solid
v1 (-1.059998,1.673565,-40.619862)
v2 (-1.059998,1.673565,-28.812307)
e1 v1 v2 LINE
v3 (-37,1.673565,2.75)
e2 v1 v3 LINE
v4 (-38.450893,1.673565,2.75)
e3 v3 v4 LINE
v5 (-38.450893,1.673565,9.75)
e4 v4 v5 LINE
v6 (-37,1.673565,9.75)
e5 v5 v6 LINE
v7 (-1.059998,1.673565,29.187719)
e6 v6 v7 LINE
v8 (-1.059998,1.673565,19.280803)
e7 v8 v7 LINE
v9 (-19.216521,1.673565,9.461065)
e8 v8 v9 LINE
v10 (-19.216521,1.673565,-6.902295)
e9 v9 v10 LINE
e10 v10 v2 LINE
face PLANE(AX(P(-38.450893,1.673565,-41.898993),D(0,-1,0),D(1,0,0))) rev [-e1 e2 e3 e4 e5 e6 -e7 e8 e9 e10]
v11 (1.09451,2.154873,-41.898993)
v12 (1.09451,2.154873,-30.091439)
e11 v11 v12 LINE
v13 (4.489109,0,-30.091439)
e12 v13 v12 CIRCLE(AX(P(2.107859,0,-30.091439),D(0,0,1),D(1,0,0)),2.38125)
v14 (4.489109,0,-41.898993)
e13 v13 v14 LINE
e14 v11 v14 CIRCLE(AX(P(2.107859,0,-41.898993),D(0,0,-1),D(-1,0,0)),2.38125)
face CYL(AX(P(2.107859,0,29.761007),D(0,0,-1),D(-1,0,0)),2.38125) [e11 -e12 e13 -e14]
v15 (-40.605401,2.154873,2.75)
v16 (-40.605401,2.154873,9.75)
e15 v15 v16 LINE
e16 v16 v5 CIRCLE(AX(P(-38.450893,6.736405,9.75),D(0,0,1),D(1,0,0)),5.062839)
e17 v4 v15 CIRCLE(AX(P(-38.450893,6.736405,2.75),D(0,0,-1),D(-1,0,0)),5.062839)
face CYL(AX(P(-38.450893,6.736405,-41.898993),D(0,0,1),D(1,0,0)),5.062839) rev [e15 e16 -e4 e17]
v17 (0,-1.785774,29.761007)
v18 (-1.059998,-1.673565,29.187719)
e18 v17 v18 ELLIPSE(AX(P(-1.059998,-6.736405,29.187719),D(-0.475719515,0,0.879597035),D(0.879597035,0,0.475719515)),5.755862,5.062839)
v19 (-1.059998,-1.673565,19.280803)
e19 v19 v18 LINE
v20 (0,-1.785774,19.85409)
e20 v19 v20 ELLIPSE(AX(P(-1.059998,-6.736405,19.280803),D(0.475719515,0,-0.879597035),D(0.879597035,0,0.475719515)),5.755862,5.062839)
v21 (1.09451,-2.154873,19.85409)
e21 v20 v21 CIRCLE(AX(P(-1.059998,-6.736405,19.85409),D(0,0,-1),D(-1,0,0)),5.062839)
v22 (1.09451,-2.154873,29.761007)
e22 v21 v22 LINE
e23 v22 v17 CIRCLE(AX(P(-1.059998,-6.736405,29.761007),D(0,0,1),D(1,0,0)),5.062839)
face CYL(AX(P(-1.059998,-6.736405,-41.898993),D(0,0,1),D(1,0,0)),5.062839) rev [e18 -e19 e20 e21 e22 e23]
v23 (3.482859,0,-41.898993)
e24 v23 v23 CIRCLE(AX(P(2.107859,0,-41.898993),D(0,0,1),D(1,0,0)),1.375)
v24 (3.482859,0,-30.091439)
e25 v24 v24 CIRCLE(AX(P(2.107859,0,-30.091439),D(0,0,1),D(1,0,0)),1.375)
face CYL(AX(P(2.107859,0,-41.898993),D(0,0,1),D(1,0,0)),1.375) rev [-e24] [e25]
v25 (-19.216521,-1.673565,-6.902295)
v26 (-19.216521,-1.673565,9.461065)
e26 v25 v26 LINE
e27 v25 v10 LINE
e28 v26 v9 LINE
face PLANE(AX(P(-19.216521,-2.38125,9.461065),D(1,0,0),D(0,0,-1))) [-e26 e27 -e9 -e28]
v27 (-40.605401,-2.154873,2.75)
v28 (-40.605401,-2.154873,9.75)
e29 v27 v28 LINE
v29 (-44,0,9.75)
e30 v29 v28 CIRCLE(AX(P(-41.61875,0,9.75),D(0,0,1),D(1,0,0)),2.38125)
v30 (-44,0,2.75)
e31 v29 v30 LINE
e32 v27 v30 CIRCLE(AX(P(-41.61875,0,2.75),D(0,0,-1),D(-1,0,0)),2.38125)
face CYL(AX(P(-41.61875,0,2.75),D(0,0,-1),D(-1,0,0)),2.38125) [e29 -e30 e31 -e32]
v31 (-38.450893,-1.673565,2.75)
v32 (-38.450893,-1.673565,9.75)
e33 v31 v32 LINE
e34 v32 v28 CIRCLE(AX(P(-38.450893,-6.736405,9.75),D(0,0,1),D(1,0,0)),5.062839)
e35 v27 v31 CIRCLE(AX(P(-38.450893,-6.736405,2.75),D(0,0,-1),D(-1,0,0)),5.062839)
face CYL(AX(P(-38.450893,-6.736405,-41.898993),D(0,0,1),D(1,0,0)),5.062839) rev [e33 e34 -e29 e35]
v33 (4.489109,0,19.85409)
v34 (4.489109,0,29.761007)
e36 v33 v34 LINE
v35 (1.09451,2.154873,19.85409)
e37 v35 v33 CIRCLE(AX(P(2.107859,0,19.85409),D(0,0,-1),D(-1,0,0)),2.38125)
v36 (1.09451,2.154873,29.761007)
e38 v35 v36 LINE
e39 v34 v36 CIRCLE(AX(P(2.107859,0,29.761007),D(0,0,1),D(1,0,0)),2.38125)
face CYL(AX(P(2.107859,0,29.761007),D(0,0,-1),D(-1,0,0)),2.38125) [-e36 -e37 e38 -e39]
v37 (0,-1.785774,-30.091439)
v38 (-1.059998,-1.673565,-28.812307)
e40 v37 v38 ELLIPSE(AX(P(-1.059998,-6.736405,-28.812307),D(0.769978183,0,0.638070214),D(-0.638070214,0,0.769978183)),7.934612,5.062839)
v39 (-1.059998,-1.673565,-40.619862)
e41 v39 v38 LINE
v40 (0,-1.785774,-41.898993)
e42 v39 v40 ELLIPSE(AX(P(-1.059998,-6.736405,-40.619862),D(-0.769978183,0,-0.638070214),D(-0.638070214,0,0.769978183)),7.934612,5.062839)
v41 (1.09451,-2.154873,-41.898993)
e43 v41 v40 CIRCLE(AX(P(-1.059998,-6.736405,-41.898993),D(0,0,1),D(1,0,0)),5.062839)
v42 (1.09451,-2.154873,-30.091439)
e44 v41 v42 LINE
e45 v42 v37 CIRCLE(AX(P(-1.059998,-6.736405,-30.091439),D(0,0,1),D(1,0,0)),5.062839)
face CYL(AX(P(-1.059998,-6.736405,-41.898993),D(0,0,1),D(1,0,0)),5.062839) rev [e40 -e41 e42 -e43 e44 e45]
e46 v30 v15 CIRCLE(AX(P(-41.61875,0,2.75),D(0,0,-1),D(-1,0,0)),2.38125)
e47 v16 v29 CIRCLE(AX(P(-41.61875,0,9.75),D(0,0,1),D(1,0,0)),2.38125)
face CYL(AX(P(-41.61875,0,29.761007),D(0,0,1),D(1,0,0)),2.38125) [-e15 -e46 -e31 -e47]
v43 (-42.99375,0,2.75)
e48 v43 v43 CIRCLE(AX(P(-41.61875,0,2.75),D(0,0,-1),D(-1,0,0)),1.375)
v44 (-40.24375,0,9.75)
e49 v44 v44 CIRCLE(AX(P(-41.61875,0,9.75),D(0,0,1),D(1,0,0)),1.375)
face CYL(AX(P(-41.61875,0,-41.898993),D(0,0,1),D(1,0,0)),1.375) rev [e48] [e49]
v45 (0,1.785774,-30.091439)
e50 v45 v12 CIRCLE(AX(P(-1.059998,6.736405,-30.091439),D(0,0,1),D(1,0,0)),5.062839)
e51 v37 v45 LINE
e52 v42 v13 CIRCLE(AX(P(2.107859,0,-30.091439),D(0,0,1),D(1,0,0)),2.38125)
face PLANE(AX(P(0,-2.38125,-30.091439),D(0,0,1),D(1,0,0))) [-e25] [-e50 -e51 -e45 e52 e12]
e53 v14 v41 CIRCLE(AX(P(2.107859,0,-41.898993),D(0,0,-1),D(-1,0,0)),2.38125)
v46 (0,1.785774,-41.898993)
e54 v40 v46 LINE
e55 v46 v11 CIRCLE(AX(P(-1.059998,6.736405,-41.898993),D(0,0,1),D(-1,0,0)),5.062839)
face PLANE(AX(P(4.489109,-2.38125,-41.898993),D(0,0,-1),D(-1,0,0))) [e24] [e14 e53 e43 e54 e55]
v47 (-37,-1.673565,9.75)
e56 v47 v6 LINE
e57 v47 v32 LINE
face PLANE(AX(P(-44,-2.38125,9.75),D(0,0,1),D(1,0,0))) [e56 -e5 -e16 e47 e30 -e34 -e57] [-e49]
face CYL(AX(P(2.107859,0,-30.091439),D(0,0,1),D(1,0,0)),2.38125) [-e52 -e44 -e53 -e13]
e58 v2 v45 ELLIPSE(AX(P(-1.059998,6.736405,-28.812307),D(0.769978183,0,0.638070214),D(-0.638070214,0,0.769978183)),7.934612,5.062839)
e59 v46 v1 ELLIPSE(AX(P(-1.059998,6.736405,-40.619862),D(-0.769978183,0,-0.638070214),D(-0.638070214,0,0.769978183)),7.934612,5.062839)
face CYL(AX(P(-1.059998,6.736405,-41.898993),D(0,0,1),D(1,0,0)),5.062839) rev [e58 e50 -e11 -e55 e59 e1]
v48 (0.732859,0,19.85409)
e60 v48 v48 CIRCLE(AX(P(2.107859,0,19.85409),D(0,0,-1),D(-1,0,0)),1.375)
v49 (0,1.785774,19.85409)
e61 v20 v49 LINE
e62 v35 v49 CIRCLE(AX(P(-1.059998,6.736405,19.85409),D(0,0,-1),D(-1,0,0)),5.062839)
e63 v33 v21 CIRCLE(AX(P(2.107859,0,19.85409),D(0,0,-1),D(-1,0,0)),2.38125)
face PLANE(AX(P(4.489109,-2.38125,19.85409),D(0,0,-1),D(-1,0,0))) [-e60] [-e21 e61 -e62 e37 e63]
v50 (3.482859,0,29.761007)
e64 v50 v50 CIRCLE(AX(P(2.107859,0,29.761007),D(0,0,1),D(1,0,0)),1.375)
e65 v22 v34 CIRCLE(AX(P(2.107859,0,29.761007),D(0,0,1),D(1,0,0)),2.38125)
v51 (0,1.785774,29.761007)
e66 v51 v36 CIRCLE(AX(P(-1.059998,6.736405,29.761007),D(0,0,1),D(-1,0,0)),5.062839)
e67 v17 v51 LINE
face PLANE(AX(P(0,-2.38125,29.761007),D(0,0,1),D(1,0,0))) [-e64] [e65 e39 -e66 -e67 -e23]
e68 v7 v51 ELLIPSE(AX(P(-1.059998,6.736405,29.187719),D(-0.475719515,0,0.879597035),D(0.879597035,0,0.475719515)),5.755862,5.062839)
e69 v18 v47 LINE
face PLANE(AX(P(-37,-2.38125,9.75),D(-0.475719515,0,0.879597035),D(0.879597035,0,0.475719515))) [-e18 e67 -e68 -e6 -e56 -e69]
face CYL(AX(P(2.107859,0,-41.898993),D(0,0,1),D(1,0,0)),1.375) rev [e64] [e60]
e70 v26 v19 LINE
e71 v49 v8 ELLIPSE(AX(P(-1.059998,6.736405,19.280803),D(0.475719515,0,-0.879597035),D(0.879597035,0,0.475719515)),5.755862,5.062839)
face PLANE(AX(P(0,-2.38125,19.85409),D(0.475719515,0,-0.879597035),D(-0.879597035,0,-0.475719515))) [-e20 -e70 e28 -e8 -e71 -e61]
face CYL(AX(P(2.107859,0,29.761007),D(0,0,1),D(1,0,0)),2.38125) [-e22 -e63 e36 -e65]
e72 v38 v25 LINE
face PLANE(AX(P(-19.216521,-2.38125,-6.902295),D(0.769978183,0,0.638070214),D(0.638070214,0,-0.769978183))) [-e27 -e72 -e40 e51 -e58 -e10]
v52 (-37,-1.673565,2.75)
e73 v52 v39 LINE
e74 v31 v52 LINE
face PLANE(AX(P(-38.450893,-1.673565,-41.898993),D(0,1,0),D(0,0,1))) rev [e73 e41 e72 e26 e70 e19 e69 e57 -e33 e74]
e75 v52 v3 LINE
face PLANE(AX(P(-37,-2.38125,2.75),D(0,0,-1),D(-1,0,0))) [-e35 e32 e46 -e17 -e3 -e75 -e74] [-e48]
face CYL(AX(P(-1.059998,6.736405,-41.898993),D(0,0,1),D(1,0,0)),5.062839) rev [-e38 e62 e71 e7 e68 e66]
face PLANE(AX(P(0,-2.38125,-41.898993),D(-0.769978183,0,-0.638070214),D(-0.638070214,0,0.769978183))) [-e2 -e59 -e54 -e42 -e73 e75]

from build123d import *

# Parameters (mm, degrees)
BOSS_EXTRUDE1_DEPTH      = 2.38125
BOSS_EXTRUDE1_DEPTH_BACK = 2.38125
CUT_EXTRUDE1_DEPTH       = 68.891743782
CUT_EXTRUDE1_DEPTH_BACK  = 68.891743782
SKETCH2_R                = 1.375
FILLET2_R                = 2.38125
CUT_EXTRUDE2_DEPTH       = 61.804572212
CUT_EXTRUDE2_DEPTH_BACK  = 61.804572212


with BuildPart() as part:
    # Sketch1 → Boss-Extrude1 (new, two sides: drawn at the far end of the back side and taken through both)
    with BuildSketch(Plane(origin=(0, 0, 0), x_dir=(1, 0, 0), z_dir=(0, 1, 0)).offset(-BOSS_EXTRUDE1_DEPTH_BACK)):
        Polygon((0, 41.898993428), (-37, -2.75), (-44, -2.75), (-44, -9.75), (-37, -9.75), (0, -29.761006572), (4.489108528, -29.761006572), (4.489108528, -19.854089936), (0, -19.854089936), (-19.216520838, -9.461064942), (-19.216520838, 6.902295225), (0, 30.091438809), (4.489108528, 30.091438809), (4.489108528, 41.898993428), align=None)
    extrude(amount=BOSS_EXTRUDE1_DEPTH + BOSS_EXTRUDE1_DEPTH_BACK)

    # Sketch2 → Cut-Extrude1 (cut, two sides: drawn at the far end of the back side and taken through both)
    with BuildSketch(Plane.XY.offset(9.75).offset(-CUT_EXTRUDE1_DEPTH_BACK)):
        with Locations((-41.61875, 0)):
            Circle(SKETCH2_R)
        with Locations((2.107858528, 0)):
            Circle(SKETCH2_R)
    extrude(amount=CUT_EXTRUDE1_DEPTH + CUT_EXTRUDE1_DEPTH_BACK, mode=Mode.SUBTRACT)

    # Fillet2
    fillet2_edges = [part.edges().sort_by_distance(p)[0] for p in [
        (4.489108528, 2.38125, -35.995216119),
        (4.489108528, -2.38125, -35.995216119),
        (4.489108528, -2.38125, 24.807548254),
        (4.489108528, 2.38125, 24.807548254),
        (-44, -2.38125, 6.25),
        (-44, 2.38125, 6.25),
    ]]
    fillet(fillet2_edges, radius=FILLET2_R - 0.0001)  # a hair under: the kernel refuses the full size

    # Sketch3 → Cut-Extrude2 (cut, two sides: drawn at the far end of the back side and taken through both)
    with BuildSketch(Plane.XY.offset(-CUT_EXTRUDE2_DEPTH_BACK)):
        with BuildLine():
            Line((-38.450893086, -1.673565387), (-1.059998386, -1.673565387))
            ThreePointArc((-1.059998386, -1.673565387), (0.043808846, -1.795357088), (1.094509688, -2.154872546))
            ThreePointArc((1.094509688, -2.154872546), (1.588695109, -2.323966632), (2.107858528, -2.38125))
            Line((2.107858528, -2.38125), (2.107858528, -4.833118282))
            Line((2.107858528, -4.833118282), (-41.61875, -4.833118282))
            Line((-41.61875, -4.833118282), (-41.61875, -2.38125))
            ThreePointArc((-41.61875, -2.38125), (-41.099586581, -2.323966632), (-40.60540116, -2.154872546))
            ThreePointArc((-40.60540116, -2.154872546), (-39.554700318, -1.795357088), (-38.450893086, -1.673565387))
        make_face()
        with BuildLine():
            Line((2.107858528, 4.833118282), (2.107858528, 2.38125))
            ThreePointArc((2.107858528, 2.38125), (1.588695109, 2.323966632), (1.094509688, 2.154872546))
            ThreePointArc((1.094509688, 2.154872546), (0.043808846, 1.795357088), (-1.059998386, 1.673565387))
            Line((-1.059998386, 1.673565387), (-38.450893086, 1.673565387))
            ThreePointArc((-38.450893086, 1.673565387), (-39.554700318, 1.795357088), (-40.60540116, 2.154872546))
            ThreePointArc((-40.60540116, 2.154872546), (-41.099586581, 2.323966632), (-41.61875, 2.38125))
            Line((-41.61875, 2.38125), (-41.61875, 4.833118282))
            Line((-41.61875, 4.833118282), (2.107858528, 4.833118282))
        make_face()
    extrude(amount=CUT_EXTRUDE2_DEPTH + CUT_EXTRUDE2_DEPTH_BACK, mode=Mode.SUBTRACT)


solid = part.part
